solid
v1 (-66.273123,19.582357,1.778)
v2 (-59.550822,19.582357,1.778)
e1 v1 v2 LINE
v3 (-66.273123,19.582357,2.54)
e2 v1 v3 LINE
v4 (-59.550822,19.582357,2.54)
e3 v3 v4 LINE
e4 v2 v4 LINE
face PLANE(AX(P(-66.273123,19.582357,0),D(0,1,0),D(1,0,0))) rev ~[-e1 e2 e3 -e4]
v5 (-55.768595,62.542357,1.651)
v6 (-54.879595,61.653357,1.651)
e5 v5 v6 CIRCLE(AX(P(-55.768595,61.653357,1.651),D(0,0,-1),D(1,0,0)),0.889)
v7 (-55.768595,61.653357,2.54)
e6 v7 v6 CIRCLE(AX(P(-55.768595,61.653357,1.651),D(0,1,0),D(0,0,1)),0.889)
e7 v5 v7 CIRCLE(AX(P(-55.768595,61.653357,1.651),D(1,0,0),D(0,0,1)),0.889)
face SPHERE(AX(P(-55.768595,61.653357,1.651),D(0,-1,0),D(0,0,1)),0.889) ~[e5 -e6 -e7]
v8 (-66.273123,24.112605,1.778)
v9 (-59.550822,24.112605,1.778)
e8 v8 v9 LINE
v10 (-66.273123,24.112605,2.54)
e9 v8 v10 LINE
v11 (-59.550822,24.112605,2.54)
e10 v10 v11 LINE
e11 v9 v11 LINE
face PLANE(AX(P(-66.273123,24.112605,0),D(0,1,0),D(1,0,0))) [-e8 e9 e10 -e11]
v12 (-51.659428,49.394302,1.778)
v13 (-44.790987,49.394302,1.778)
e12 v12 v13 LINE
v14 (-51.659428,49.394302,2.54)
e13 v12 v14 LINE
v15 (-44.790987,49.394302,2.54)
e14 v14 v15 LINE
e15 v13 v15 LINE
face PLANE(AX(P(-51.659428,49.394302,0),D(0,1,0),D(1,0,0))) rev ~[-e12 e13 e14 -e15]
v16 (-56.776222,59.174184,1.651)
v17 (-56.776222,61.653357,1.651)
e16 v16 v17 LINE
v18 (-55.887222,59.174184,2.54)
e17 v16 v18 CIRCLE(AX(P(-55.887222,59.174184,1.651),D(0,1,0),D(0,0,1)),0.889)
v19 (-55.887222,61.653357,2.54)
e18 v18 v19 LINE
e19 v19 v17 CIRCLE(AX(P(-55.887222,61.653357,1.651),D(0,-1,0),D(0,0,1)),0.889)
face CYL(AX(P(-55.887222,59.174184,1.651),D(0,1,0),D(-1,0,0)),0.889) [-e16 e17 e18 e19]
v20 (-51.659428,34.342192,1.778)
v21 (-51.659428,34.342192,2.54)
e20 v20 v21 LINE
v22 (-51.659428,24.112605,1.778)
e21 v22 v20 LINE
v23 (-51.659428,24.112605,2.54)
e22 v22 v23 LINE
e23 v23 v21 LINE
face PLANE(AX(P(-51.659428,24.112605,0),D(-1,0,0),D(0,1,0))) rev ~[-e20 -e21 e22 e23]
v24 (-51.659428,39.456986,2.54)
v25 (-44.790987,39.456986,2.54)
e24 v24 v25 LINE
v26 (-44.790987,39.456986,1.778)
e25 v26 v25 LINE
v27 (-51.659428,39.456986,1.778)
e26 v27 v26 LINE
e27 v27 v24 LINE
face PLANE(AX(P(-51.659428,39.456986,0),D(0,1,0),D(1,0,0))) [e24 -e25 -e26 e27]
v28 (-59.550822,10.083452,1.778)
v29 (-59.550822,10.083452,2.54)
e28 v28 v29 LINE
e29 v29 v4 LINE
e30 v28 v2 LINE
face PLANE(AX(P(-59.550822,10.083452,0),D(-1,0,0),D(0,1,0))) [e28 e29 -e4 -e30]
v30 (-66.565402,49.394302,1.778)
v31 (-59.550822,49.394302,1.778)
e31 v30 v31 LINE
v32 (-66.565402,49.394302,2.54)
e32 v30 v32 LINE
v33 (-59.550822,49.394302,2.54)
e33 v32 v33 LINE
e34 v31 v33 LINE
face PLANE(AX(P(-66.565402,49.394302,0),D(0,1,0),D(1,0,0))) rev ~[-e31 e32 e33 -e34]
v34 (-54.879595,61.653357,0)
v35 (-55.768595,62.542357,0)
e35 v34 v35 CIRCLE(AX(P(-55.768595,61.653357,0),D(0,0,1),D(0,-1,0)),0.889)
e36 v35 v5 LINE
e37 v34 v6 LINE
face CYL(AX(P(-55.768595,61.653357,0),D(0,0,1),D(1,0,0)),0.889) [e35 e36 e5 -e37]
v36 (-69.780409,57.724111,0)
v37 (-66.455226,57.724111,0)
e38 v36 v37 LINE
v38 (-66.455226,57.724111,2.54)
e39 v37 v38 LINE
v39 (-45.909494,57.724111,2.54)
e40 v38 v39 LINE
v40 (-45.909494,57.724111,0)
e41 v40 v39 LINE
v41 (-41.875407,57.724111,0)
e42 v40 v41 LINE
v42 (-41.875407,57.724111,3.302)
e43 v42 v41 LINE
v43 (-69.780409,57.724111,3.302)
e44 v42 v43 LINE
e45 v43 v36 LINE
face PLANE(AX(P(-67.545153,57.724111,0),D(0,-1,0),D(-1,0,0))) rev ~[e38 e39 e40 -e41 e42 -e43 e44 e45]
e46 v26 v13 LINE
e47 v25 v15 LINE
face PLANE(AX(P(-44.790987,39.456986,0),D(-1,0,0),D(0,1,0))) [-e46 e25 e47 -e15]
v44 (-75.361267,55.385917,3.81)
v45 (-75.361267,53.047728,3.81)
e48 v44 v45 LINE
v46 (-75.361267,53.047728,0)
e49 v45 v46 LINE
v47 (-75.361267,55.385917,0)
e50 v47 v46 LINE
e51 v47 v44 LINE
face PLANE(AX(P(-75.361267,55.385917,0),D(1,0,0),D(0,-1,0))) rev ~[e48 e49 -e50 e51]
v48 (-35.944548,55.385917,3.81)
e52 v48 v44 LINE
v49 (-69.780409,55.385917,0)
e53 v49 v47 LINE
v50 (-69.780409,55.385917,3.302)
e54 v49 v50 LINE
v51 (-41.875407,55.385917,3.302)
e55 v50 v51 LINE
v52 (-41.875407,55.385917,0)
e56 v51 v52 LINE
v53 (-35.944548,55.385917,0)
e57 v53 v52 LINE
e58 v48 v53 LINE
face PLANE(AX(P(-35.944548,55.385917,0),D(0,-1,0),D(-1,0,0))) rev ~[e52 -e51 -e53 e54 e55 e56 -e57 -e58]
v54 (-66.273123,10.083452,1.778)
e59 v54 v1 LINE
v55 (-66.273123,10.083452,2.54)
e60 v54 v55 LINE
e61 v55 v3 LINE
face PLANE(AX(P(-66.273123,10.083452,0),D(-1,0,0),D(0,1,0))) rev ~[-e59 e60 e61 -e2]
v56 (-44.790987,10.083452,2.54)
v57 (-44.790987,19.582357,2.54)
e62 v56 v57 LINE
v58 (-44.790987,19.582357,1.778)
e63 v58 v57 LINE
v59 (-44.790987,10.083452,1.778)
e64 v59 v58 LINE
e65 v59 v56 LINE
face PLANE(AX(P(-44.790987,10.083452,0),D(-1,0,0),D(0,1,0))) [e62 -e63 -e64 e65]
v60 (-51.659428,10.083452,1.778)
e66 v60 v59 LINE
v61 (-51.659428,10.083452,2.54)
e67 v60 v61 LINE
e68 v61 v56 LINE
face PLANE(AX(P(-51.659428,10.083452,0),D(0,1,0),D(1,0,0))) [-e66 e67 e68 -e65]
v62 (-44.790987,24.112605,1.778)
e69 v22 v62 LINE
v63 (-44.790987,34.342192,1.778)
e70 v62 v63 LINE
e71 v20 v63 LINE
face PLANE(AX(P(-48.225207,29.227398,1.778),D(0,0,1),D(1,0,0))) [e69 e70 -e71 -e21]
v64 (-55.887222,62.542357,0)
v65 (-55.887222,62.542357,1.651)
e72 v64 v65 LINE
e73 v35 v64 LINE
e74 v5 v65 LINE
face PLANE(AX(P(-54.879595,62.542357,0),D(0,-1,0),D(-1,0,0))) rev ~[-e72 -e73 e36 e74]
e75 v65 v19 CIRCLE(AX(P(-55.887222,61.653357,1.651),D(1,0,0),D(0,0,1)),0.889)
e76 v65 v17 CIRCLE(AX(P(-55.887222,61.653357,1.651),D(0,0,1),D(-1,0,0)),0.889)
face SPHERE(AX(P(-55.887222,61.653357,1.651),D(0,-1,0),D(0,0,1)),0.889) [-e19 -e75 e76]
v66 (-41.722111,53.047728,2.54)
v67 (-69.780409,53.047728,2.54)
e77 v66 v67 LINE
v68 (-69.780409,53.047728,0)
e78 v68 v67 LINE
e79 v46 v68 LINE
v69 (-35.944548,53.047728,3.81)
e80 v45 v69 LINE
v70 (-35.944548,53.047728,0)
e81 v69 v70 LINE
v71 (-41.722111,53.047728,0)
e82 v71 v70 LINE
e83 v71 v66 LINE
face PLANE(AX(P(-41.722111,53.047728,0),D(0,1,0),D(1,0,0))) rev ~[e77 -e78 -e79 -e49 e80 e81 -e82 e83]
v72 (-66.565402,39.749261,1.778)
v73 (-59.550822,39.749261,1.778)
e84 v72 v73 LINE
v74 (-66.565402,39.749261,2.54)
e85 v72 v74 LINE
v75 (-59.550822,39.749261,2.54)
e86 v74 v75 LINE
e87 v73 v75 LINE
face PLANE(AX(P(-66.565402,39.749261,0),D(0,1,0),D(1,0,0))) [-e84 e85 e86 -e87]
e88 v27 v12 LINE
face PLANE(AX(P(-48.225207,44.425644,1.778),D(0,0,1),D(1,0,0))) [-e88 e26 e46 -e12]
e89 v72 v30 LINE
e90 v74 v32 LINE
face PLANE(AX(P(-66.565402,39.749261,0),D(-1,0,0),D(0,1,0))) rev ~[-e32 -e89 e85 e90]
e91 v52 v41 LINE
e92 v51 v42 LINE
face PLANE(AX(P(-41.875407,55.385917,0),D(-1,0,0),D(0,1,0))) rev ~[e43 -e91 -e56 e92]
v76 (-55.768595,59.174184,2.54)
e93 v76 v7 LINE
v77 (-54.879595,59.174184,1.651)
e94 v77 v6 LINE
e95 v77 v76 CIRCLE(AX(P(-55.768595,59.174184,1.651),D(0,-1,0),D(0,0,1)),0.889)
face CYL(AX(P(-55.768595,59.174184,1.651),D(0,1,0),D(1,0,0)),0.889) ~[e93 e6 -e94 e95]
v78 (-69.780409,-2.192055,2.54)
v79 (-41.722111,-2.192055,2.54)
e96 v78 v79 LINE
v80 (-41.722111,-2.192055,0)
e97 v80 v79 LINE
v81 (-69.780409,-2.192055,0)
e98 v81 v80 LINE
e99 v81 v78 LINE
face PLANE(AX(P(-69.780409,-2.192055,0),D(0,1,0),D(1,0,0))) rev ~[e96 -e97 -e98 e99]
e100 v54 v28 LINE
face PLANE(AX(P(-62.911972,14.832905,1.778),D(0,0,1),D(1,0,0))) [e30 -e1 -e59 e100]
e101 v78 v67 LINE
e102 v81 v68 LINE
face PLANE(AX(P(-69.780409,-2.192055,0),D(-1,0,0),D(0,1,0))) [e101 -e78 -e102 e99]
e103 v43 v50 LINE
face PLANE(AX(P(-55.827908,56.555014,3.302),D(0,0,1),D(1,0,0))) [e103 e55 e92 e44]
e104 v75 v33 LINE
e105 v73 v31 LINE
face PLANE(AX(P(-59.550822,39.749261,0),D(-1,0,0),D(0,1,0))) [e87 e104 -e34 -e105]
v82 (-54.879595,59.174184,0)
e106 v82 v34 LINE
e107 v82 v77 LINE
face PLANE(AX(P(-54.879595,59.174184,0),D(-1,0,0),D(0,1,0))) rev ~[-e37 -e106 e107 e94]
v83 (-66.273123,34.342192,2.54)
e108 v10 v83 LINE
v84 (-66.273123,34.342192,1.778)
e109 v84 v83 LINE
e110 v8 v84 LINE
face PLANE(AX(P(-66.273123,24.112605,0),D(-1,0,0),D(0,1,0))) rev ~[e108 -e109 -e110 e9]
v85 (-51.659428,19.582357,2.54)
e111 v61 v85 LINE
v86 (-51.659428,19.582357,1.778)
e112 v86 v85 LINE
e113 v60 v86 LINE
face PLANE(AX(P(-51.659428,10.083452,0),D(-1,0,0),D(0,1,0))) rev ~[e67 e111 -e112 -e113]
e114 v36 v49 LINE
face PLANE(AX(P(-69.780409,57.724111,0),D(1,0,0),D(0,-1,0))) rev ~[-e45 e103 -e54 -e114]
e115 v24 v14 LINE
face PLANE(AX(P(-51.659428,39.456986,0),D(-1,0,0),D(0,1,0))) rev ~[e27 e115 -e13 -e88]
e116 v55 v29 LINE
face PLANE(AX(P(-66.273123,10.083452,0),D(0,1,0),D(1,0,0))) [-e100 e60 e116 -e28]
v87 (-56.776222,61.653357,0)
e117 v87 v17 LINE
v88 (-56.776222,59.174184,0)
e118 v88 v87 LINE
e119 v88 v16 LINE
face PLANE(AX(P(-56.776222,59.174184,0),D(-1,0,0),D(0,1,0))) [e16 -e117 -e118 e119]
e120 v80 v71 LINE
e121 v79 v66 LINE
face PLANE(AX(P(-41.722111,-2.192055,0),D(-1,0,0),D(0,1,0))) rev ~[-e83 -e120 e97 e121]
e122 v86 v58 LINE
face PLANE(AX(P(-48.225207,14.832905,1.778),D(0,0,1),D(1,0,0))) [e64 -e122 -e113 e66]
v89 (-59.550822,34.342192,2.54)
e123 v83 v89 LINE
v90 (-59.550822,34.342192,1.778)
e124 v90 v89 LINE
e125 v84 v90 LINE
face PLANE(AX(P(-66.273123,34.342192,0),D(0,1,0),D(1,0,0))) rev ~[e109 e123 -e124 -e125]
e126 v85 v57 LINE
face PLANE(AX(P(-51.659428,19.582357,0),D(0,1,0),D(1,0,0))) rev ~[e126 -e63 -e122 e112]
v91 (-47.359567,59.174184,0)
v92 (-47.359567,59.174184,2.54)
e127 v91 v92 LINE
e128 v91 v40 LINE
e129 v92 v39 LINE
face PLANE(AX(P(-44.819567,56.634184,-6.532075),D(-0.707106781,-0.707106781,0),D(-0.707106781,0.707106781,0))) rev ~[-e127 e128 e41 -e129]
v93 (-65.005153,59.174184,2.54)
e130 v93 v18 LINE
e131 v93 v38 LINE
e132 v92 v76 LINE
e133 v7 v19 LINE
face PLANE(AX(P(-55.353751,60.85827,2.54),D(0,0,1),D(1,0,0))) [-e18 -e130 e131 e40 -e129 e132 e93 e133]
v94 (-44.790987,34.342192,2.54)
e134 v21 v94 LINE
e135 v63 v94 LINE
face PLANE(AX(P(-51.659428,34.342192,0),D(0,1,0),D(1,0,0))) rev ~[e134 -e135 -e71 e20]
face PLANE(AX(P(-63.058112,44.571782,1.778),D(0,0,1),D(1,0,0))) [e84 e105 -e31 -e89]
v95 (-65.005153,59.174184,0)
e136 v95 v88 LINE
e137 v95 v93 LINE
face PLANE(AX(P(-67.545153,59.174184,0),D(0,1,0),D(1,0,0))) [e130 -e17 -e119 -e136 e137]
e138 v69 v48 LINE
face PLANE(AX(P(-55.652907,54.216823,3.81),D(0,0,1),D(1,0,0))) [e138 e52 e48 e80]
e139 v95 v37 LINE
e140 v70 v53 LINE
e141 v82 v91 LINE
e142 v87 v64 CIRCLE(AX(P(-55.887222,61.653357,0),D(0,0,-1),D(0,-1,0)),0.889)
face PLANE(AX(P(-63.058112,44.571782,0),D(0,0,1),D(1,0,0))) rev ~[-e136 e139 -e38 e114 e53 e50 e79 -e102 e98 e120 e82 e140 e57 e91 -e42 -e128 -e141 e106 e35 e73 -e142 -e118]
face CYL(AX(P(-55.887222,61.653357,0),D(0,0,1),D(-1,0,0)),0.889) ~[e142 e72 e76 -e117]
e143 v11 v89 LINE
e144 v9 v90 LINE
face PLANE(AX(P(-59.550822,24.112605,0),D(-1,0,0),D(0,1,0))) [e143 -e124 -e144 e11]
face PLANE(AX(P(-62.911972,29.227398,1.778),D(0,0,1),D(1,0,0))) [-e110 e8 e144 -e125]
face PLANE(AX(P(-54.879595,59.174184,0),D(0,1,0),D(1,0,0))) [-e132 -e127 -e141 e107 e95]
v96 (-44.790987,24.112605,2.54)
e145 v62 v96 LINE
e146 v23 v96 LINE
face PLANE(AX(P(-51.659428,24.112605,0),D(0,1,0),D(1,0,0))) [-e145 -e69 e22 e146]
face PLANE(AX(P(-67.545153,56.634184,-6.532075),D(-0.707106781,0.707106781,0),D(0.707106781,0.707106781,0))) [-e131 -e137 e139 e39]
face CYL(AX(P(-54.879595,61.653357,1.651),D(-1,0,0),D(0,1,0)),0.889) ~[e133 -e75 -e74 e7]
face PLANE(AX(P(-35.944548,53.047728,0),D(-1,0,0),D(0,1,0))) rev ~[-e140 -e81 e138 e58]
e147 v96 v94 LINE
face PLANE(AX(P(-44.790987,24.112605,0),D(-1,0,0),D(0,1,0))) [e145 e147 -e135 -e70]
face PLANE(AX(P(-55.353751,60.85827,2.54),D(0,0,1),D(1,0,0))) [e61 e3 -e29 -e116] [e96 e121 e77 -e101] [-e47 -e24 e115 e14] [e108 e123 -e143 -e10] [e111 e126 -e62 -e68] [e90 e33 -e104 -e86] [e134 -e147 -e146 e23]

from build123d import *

# Parameters (mm, degrees)
F0_W        = 0.9483136237
F0_H        = 3.3681727946
F0_W_2      = 28.0582979321
F0_H_2      = 55.2397826687
F0_W_3      = 6.7223012447
F0_H_3      = 9.4989053905
F0_H_4      = 10.2295875549
F0_W_4      = 6.8684406579
F0_W_5      = 7.014580071
F0_H_5      = 9.6450410783
F0_H_6      = 9.9373161793
F0_W_6      = 10.7689313591
F0_H_7      = 1.450072974
F0_W_7      = 10.0600272417
F1_DEPTH    = 2.54
F2_R        = 0.889
F3_DEPTH    = 1.778
F4_T4_DEPTH = 15.6041495789
F4_T9_DEPTH = 15.6041495789
F5_DEPTH    = 3.81
F6_DEPTH    = 3.302


# Not quite as in the source:
# - a fillet or chamfer that OpenCascade refuses, or shapes differently, is made with other operations: its cross-section is extruded or revolved along the edge and cut away or added


with BuildPart() as f1:
    # F0 (on Top) → F1 (new body)
    with BuildSketch(Plane.XY):
        with Locations((-55.3537514061, 60.8582701534)):
            Rectangle(F0_W, F0_H)
        Polygon((-69.7804093361, 57.7241107821), (-69.7804093361, 55.3859174252), (-41.8754070997, 55.3859174252), (-41.8754070997, 57.7241107821), (-44.8195673525, 57.7241107821), (-54.8795945942, 57.7241107821), (-55.8279082179, 57.7241107821), (-56.7762218416, 57.7241107821), (-67.5451532006, 57.7241107821), align=None)
        Polygon((-75.3612667322, 53.0477277935), (-69.7804093361, 53.0477277935), (-41.7221114039, 53.0477277935), (-35.9445475042, 53.0477277935), (-35.9445475042, 55.3859174252), (-41.8754070997, 55.3859174252), (-69.7804093361, 55.3859174252), (-75.3612667322, 55.3859174252), align=None)
        with Locations((-56.3020650297, 60.8582701534)):
            Rectangle(F0_W, F0_H)
        with Locations((-55.75126037, 25.4278364591)):
            Rectangle(F0_W_2, F0_H_2)
        with Locations((-62.9119724035, 14.8329045624)):
            Rectangle(F0_W_3, F0_H_3, mode=Mode.SUBTRACT)
        with Locations((-62.9119724035, 29.2273983359)):
            Rectangle(F0_W_3, F0_H_4, mode=Mode.SUBTRACT)
        with Locations((-48.2252072543, 14.8329045624)):
            Rectangle(F0_W_4, F0_H_3, mode=Mode.SUBTRACT)
        with Locations((-48.2252072543, 29.2273983359)):
            Rectangle(F0_W_4, F0_H_4, mode=Mode.SUBTRACT)
        with Locations((-63.0581118166, 44.571781531)):
            Rectangle(F0_W_5, F0_H_5, mode=Mode.SUBTRACT)
        with Locations((-48.2252072543, 44.4256439805)):
            Rectangle(F0_W_4, F0_H_6, mode=Mode.SUBTRACT)
        with Locations((-62.1606875211, 58.4491472691)):
            Rectangle(F0_W_6, F0_H_7)
        with Locations((-55.3537514061, 58.4491472691)):
            Rectangle(F0_W, F0_H_7)
        with Locations((-49.8495809734, 58.4491472691)):
            Rectangle(F0_W_7, F0_H_7)
        with Locations((-56.3020650297, 58.4491472691)):
            Rectangle(F0_W, F0_H_7)
    extrude(amount=F1_DEPTH)

    # F2
    f2_edges = [f1.edges().sort_by_distance(p)[0] for p in [
        (-54.879595, 60.85827, 2.54),
        (-56.776222, 60.85827, 2.54),
        (-55.827908, 62.542357, 2.54),
        (-56.776222, 62.542357, 1.27),
        (-54.879595, 62.542357, 1.27),
    ]]
    fillet(f2_edges, radius=F2_R)

    # F0 (on Top) → F3 (join)
    with BuildSketch(Plane.XY):
        with Locations((-63.0581118166, 44.571781531)):
            Rectangle(F0_W_5, F0_H_5)
        with Locations((-48.2252072543, 44.4256439805)):
            Rectangle(F0_W_4, F0_H_6)
        with Locations((-62.9119724035, 29.2273983359)):
            Rectangle(F0_W_3, F0_H_4)
        with Locations((-48.2252072543, 29.2273983359)):
            Rectangle(F0_W_4, F0_H_4)
        with Locations((-48.2252072543, 14.8329045624)):
            Rectangle(F0_W_4, F0_H_3)
        with Locations((-62.9119724035, 14.8329045624)):
            Rectangle(F0_W_3, F0_H_3)
    extrude(amount=F3_DEPTH)

    # F4: chamfer of 2.54 on 2 edges, made by hand


with BuildPart() as f4_tool2:
    # F4_s3 → F4_t4 (new body)
    with BuildSketch(Plane.XY.offset(-6.5320747894)):
        Polygon((-67.5451532006, 56.6341837561), (-65.0051532006, 59.1741837561), (-67.5451532006, 59.1741837561), align=None)
    extrude(amount=F4_T4_DEPTH)

    split(bisect_by=Plane.XZ.offset(-57.7241107821), keep=Keep.BOTTOM)


with BuildPart() as f1_1:
    add(f1.part)

    # F4_t1: cut F4_tool2
    add(f4_tool2.part, mode=Mode.SUBTRACT)


with BuildPart() as f4_tool7:
    # F4_s8 → F4_t9 (new body)
    with BuildSketch(Plane.XY.offset(-6.5320747894)):
        Polygon((-44.8195673525, 56.6341837561), (-47.3595673525, 59.1741837561), (-44.8195673525, 59.1741837561), align=None)
    extrude(amount=F4_T9_DEPTH)

    split(bisect_by=Plane.XZ.offset(-57.7241107821), keep=Keep.BOTTOM)


with BuildPart() as f1_2:
    add(f1_1.part)

    # F4_t6: cut F4_tool7
    add(f4_tool7.part, mode=Mode.SUBTRACT)

    # F0 (on Top) → F5 (join)
    with BuildSketch(Plane.XY):
        Polygon((-75.3612667322, 53.0477277935), (-69.7804093361, 53.0477277935), (-41.7221114039, 53.0477277935), (-35.9445475042, 53.0477277935), (-35.9445475042, 55.3859174252), (-41.8754070997, 55.3859174252), (-69.7804093361, 55.3859174252), (-75.3612667322, 55.3859174252), align=None)
    extrude(amount=F5_DEPTH)

    # F0 (on Top) → F6 (join)
    with BuildSketch(Plane.XY):
        Polygon((-69.7804093361, 57.7241107821), (-69.7804093361, 55.3859174252), (-41.8754070997, 55.3859174252), (-41.8754070997, 57.7241107821), (-44.8195673525, 57.7241107821), (-54.8795945942, 57.7241107821), (-55.8279082179, 57.7241107821), (-56.7762218416, 57.7241107821), (-67.5451532006, 57.7241107821), align=None)
    extrude(amount=F6_DEPTH)


solid = f1_2.part
